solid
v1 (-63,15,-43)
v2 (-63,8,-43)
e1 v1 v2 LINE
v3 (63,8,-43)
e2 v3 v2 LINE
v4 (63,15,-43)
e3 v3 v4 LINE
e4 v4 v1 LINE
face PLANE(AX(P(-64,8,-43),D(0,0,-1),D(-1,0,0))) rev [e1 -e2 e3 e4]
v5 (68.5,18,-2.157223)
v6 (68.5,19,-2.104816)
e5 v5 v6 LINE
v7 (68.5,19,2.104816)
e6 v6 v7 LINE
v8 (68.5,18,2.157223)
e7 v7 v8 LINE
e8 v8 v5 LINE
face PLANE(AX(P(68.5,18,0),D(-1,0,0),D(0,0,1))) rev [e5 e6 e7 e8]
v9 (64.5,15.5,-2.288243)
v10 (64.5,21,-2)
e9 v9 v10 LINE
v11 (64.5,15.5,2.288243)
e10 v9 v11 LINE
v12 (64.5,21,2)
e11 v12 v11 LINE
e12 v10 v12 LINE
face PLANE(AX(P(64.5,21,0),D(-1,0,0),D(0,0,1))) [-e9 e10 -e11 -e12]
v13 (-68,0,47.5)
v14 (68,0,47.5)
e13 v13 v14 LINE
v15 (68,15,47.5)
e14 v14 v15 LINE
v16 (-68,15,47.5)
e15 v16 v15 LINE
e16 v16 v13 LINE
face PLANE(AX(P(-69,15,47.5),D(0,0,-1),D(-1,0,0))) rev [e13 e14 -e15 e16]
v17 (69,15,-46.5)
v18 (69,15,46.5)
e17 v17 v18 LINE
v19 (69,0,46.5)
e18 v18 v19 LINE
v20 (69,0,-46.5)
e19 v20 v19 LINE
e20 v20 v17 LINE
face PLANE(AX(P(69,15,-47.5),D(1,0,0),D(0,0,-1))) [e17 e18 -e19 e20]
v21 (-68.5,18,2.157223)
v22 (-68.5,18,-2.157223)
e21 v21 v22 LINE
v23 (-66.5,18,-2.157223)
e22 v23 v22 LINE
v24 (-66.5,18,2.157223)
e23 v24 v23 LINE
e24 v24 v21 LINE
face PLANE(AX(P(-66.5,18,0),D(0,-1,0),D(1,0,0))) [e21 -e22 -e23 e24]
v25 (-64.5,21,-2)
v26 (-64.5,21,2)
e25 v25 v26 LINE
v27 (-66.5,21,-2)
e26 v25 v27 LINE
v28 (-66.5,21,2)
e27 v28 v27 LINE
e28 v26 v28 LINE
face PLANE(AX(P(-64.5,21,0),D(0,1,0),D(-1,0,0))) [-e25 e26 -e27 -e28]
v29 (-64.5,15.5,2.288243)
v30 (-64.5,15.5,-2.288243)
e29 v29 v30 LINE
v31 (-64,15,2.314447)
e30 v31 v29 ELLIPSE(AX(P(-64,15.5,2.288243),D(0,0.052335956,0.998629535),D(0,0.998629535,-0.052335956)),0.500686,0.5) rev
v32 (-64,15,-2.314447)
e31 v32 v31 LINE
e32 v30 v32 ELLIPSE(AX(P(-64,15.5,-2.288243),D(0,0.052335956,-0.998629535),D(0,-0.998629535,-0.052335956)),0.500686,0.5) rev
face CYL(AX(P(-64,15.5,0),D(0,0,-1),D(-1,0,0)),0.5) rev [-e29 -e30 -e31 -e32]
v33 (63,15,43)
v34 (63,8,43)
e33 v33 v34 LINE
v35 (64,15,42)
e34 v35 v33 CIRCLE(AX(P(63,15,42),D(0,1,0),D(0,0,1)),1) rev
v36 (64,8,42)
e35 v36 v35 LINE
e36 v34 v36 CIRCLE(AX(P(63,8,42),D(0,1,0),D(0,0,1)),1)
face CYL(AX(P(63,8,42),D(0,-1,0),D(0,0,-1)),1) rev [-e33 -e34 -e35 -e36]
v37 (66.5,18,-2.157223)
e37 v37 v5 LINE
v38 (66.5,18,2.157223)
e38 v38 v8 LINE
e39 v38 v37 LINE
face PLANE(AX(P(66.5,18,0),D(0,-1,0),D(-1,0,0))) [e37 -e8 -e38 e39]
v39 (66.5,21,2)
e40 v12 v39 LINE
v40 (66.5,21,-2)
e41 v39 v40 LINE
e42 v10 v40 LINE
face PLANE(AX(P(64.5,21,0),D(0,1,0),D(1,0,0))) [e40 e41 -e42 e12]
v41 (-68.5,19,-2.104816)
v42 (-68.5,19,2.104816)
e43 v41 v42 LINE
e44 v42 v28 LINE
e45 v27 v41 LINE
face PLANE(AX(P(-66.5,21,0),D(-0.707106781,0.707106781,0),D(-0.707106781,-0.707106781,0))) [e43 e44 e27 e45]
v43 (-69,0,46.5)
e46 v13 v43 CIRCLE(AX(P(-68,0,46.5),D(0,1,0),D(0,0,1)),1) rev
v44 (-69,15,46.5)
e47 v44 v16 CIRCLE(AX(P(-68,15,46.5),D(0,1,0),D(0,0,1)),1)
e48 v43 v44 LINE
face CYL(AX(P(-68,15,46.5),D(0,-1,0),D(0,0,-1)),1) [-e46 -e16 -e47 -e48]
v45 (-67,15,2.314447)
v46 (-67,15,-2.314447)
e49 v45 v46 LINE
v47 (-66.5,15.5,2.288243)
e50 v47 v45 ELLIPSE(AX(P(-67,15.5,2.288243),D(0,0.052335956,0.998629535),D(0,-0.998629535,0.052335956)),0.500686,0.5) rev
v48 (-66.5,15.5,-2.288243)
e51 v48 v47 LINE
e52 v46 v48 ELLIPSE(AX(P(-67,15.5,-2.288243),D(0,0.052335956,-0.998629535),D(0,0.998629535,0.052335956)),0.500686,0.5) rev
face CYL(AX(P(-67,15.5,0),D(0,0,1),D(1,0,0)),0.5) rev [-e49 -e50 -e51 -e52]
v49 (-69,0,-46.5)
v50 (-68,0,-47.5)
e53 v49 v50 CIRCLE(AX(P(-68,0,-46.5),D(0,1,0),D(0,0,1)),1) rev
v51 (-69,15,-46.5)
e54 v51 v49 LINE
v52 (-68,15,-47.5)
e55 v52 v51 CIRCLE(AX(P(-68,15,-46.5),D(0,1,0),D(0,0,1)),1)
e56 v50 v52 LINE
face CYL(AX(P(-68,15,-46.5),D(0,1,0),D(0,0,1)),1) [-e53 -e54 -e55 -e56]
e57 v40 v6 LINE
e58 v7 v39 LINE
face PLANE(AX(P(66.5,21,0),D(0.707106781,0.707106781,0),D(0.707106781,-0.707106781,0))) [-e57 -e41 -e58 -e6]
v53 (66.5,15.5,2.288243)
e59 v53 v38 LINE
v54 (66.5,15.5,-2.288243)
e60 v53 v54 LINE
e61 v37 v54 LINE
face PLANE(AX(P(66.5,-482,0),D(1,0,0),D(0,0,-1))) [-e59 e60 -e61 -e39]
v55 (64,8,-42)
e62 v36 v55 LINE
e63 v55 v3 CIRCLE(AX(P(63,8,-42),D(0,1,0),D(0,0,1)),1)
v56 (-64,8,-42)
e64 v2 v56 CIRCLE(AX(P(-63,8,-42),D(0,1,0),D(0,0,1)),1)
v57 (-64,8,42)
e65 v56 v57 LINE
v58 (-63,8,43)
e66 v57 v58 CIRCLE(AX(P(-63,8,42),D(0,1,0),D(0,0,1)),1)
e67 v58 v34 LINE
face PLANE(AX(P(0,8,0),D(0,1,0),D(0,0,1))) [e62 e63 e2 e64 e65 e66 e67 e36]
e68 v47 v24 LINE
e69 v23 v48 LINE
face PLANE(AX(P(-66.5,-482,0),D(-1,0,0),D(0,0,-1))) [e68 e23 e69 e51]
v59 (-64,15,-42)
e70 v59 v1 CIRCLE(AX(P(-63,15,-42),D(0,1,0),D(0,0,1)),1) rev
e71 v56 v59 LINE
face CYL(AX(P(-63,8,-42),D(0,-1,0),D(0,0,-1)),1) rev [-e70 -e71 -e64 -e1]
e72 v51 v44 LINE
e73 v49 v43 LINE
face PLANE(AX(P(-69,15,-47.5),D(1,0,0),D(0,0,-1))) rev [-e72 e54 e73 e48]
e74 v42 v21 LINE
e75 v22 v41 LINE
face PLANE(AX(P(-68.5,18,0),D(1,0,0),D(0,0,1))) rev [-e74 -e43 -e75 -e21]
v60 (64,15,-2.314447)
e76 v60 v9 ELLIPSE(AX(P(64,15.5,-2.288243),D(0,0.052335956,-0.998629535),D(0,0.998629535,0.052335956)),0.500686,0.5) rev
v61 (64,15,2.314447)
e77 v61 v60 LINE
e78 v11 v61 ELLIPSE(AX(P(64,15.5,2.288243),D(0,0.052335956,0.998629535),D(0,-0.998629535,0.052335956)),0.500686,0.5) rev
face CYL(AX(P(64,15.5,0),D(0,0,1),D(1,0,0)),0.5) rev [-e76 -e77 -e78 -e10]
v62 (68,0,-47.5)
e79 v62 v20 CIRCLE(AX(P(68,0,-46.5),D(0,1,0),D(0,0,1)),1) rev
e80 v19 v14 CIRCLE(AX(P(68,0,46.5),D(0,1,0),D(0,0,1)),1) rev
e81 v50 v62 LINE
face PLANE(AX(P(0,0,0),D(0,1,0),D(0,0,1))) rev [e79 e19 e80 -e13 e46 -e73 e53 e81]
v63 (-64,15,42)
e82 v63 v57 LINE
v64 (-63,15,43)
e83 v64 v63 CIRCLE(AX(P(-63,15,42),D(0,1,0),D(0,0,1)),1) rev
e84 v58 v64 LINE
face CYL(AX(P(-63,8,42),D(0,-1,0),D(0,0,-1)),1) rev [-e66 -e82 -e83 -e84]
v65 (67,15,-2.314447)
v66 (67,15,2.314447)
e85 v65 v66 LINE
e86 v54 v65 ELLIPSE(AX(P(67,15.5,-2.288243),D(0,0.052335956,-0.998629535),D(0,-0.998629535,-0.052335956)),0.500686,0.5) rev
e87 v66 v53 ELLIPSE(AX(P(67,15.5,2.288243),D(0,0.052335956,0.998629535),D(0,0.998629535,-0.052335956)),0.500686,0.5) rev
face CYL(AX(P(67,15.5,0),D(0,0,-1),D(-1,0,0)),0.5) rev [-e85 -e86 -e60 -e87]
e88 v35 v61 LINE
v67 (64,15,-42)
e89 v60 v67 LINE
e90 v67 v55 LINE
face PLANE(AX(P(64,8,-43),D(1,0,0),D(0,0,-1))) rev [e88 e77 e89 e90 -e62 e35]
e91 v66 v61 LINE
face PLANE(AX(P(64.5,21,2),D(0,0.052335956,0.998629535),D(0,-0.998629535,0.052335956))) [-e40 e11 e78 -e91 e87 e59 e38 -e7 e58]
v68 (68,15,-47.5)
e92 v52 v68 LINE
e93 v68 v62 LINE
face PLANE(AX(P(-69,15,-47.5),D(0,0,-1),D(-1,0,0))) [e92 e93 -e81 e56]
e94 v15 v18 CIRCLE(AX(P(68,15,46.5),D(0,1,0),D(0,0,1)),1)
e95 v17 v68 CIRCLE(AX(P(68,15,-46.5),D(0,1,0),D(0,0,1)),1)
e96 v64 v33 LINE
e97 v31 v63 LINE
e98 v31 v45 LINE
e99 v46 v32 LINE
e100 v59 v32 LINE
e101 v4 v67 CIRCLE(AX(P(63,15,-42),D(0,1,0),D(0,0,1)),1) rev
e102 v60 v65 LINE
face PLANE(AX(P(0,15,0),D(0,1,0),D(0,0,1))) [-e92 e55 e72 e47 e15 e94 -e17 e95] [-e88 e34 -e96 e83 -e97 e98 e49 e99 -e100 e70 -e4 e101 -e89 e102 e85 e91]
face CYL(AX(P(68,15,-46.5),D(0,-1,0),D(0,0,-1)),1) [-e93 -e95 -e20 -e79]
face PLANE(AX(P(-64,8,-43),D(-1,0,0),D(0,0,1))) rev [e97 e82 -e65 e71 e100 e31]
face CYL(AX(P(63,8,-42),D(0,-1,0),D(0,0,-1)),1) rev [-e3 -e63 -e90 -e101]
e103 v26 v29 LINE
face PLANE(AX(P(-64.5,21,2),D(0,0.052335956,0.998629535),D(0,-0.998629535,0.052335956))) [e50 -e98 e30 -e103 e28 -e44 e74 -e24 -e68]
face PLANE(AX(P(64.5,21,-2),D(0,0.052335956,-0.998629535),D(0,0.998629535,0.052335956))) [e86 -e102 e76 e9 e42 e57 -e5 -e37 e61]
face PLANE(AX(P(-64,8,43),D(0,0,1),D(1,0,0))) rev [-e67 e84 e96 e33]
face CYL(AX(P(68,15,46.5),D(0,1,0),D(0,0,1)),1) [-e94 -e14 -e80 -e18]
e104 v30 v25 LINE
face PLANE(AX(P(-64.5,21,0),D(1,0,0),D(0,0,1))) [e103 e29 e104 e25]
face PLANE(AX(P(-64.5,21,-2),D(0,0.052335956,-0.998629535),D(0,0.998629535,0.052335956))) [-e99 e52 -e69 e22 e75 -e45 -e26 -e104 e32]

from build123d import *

# Parameters (mm, degrees)
SKETCH1_W           = 138
SKETCH1_H           = 95
BOSS_EXTRUDE1_DEPTH = 15
SKETCH2_W           = 128
SKETCH2_H           = 86
CUT_EXTRUDE1_DEPTH  = 7
SNAP_START          = 64.5
SNAP_HOOK2_DEPTH    = 2
SNAP_HOOK2_2_DEPTH  = 2
FILLET1_R           = 1
FILLET2_R           = 0.5


with BuildPart() as part:
    # Sketch1 → Boss-Extrude1 (new body)
    with BuildSketch(Plane(origin=(0, 0, 0), x_dir=(1, 0, 0), z_dir=(0, 1, 0))):
        Rectangle(SKETCH1_W, SKETCH1_H)
    extrude(amount=BOSS_EXTRUDE1_DEPTH)

    # Sketch2 → Cut-Extrude1 (cut)
    with BuildSketch(Plane(origin=(0, 15, 0), x_dir=(1, 0, 0), z_dir=(0, 1, 0))):
        Rectangle(SKETCH2_W, SKETCH2_H)
    extrude(amount=-CUT_EXTRUDE1_DEPTH, mode=Mode.SUBTRACT)



with BuildPart() as body_2:
    # Snap Hook2: read off the stored shape, not the designer's step
    # Snap Hook2 outline → Snap Hook2 (new body)
    with BuildSketch(Plane.YZ.offset(SNAP_START)):
        Polygon((21, -2), (21, 2), (18, 2.157223338), (18, -2.157223338), align=None)
    snap_hook2 = extrude(amount=SNAP_HOOK2_DEPTH)


with BuildPart() as part_1:
    add(part.part)

    add(body_2.part)  # Snap Hook2 2 merges body 2
    # Snap Hook2 2 outline → Snap Hook2 2 (add)
    with BuildSketch(Plane.YZ.offset(SNAP_START)):
        Polygon((18, -2.157223338), (18, 2.157223338), (15, 2.314446676), (15, -2.314446676), align=None)
    snap_hook2_2 = extrude(amount=SNAP_HOOK2_2_DEPTH)

    # Snap Hook2 3: loft between two sections, ruled curve by curve
    snap_hook2_3_from = [
        Edge.make_line((66.5, 21, -2), (66.5, 21, 2)),
        Edge.make_line((66.5, 18, 2.157223338), (66.5, 18, -2.157223338)),
        Edge.make_line((66.5, 18, 2.157223338), (66.5, 21, 2)),
        Edge.make_line((66.5, 18, -2.157223338), (66.5, 21, -2)),
    ]
    snap_hook2_3_to = [
        Edge.make_line((68.5, 19, -2.104815559), (68.5, 19, 2.104815559)),
        Edge.make_line((68.5, 18, 2.157223338), (68.5, 18, -2.157223338)),
        Edge.make_line((68.5, 18, 2.157223338), (68.5, 19, 2.104815559)),
        Edge.make_line((68.5, 18, -2.157223338), (68.5, 19, -2.104815559)),
    ]
    snap_hook2_3 = Solid(Shell([*[Face.make_surface_from_curves(snap_hook2_3_from[k], snap_hook2_3_to[k]) for k in range(4)], Face(Wire(snap_hook2_3_from)), Face(Wire(snap_hook2_3_to))]))
    add(snap_hook2_3)

    # Fillet1
    fillet1_edges = [part_1.edges().sort_by_distance(p)[0] for p in [
        (64, 11.5, -43),
        (64, 11.5, 43),
        (-64, 11.5, 43),
        (-64, 11.5, -43),
        (-69, 7.5, -47.5),
        (69, 7.5, -47.5),
        (69, 7.5, 47.5),
        (-69, 7.5, 47.5),
    ]]
    fillet(fillet1_edges, radius=FILLET1_R)

    # Mirror1: Snap Hook2, Snap Hook2 2, Snap Hook2 3 across plane
    add(snap_hook2.mirror(Plane(origin=(0, 0, 0), x_dir=(0, 0, 1), z_dir=(1, 0, 0))))
    add(snap_hook2_2.mirror(Plane(origin=(0, 0, 0), x_dir=(0, 0, 1), z_dir=(1, 0, 0))))
    add(snap_hook2_3.mirror(Plane(origin=(0, 0, 0), x_dir=(0, 0, 1), z_dir=(1, 0, 0))))

    # Fillet2
    fillet2_edges = [part_1.edges().sort_by_distance(p)[0] for p in [
        (66.5, 15, 0),
        (64.5, 15, 0),
        (-66.5, 15, 0),
        (-64.5, 15, 0),
    ]]
    fillet(fillet2_edges, radius=FILLET2_R - 0.0001)  # a hair under: the kernel refuses the full size


solid = part_1.part
